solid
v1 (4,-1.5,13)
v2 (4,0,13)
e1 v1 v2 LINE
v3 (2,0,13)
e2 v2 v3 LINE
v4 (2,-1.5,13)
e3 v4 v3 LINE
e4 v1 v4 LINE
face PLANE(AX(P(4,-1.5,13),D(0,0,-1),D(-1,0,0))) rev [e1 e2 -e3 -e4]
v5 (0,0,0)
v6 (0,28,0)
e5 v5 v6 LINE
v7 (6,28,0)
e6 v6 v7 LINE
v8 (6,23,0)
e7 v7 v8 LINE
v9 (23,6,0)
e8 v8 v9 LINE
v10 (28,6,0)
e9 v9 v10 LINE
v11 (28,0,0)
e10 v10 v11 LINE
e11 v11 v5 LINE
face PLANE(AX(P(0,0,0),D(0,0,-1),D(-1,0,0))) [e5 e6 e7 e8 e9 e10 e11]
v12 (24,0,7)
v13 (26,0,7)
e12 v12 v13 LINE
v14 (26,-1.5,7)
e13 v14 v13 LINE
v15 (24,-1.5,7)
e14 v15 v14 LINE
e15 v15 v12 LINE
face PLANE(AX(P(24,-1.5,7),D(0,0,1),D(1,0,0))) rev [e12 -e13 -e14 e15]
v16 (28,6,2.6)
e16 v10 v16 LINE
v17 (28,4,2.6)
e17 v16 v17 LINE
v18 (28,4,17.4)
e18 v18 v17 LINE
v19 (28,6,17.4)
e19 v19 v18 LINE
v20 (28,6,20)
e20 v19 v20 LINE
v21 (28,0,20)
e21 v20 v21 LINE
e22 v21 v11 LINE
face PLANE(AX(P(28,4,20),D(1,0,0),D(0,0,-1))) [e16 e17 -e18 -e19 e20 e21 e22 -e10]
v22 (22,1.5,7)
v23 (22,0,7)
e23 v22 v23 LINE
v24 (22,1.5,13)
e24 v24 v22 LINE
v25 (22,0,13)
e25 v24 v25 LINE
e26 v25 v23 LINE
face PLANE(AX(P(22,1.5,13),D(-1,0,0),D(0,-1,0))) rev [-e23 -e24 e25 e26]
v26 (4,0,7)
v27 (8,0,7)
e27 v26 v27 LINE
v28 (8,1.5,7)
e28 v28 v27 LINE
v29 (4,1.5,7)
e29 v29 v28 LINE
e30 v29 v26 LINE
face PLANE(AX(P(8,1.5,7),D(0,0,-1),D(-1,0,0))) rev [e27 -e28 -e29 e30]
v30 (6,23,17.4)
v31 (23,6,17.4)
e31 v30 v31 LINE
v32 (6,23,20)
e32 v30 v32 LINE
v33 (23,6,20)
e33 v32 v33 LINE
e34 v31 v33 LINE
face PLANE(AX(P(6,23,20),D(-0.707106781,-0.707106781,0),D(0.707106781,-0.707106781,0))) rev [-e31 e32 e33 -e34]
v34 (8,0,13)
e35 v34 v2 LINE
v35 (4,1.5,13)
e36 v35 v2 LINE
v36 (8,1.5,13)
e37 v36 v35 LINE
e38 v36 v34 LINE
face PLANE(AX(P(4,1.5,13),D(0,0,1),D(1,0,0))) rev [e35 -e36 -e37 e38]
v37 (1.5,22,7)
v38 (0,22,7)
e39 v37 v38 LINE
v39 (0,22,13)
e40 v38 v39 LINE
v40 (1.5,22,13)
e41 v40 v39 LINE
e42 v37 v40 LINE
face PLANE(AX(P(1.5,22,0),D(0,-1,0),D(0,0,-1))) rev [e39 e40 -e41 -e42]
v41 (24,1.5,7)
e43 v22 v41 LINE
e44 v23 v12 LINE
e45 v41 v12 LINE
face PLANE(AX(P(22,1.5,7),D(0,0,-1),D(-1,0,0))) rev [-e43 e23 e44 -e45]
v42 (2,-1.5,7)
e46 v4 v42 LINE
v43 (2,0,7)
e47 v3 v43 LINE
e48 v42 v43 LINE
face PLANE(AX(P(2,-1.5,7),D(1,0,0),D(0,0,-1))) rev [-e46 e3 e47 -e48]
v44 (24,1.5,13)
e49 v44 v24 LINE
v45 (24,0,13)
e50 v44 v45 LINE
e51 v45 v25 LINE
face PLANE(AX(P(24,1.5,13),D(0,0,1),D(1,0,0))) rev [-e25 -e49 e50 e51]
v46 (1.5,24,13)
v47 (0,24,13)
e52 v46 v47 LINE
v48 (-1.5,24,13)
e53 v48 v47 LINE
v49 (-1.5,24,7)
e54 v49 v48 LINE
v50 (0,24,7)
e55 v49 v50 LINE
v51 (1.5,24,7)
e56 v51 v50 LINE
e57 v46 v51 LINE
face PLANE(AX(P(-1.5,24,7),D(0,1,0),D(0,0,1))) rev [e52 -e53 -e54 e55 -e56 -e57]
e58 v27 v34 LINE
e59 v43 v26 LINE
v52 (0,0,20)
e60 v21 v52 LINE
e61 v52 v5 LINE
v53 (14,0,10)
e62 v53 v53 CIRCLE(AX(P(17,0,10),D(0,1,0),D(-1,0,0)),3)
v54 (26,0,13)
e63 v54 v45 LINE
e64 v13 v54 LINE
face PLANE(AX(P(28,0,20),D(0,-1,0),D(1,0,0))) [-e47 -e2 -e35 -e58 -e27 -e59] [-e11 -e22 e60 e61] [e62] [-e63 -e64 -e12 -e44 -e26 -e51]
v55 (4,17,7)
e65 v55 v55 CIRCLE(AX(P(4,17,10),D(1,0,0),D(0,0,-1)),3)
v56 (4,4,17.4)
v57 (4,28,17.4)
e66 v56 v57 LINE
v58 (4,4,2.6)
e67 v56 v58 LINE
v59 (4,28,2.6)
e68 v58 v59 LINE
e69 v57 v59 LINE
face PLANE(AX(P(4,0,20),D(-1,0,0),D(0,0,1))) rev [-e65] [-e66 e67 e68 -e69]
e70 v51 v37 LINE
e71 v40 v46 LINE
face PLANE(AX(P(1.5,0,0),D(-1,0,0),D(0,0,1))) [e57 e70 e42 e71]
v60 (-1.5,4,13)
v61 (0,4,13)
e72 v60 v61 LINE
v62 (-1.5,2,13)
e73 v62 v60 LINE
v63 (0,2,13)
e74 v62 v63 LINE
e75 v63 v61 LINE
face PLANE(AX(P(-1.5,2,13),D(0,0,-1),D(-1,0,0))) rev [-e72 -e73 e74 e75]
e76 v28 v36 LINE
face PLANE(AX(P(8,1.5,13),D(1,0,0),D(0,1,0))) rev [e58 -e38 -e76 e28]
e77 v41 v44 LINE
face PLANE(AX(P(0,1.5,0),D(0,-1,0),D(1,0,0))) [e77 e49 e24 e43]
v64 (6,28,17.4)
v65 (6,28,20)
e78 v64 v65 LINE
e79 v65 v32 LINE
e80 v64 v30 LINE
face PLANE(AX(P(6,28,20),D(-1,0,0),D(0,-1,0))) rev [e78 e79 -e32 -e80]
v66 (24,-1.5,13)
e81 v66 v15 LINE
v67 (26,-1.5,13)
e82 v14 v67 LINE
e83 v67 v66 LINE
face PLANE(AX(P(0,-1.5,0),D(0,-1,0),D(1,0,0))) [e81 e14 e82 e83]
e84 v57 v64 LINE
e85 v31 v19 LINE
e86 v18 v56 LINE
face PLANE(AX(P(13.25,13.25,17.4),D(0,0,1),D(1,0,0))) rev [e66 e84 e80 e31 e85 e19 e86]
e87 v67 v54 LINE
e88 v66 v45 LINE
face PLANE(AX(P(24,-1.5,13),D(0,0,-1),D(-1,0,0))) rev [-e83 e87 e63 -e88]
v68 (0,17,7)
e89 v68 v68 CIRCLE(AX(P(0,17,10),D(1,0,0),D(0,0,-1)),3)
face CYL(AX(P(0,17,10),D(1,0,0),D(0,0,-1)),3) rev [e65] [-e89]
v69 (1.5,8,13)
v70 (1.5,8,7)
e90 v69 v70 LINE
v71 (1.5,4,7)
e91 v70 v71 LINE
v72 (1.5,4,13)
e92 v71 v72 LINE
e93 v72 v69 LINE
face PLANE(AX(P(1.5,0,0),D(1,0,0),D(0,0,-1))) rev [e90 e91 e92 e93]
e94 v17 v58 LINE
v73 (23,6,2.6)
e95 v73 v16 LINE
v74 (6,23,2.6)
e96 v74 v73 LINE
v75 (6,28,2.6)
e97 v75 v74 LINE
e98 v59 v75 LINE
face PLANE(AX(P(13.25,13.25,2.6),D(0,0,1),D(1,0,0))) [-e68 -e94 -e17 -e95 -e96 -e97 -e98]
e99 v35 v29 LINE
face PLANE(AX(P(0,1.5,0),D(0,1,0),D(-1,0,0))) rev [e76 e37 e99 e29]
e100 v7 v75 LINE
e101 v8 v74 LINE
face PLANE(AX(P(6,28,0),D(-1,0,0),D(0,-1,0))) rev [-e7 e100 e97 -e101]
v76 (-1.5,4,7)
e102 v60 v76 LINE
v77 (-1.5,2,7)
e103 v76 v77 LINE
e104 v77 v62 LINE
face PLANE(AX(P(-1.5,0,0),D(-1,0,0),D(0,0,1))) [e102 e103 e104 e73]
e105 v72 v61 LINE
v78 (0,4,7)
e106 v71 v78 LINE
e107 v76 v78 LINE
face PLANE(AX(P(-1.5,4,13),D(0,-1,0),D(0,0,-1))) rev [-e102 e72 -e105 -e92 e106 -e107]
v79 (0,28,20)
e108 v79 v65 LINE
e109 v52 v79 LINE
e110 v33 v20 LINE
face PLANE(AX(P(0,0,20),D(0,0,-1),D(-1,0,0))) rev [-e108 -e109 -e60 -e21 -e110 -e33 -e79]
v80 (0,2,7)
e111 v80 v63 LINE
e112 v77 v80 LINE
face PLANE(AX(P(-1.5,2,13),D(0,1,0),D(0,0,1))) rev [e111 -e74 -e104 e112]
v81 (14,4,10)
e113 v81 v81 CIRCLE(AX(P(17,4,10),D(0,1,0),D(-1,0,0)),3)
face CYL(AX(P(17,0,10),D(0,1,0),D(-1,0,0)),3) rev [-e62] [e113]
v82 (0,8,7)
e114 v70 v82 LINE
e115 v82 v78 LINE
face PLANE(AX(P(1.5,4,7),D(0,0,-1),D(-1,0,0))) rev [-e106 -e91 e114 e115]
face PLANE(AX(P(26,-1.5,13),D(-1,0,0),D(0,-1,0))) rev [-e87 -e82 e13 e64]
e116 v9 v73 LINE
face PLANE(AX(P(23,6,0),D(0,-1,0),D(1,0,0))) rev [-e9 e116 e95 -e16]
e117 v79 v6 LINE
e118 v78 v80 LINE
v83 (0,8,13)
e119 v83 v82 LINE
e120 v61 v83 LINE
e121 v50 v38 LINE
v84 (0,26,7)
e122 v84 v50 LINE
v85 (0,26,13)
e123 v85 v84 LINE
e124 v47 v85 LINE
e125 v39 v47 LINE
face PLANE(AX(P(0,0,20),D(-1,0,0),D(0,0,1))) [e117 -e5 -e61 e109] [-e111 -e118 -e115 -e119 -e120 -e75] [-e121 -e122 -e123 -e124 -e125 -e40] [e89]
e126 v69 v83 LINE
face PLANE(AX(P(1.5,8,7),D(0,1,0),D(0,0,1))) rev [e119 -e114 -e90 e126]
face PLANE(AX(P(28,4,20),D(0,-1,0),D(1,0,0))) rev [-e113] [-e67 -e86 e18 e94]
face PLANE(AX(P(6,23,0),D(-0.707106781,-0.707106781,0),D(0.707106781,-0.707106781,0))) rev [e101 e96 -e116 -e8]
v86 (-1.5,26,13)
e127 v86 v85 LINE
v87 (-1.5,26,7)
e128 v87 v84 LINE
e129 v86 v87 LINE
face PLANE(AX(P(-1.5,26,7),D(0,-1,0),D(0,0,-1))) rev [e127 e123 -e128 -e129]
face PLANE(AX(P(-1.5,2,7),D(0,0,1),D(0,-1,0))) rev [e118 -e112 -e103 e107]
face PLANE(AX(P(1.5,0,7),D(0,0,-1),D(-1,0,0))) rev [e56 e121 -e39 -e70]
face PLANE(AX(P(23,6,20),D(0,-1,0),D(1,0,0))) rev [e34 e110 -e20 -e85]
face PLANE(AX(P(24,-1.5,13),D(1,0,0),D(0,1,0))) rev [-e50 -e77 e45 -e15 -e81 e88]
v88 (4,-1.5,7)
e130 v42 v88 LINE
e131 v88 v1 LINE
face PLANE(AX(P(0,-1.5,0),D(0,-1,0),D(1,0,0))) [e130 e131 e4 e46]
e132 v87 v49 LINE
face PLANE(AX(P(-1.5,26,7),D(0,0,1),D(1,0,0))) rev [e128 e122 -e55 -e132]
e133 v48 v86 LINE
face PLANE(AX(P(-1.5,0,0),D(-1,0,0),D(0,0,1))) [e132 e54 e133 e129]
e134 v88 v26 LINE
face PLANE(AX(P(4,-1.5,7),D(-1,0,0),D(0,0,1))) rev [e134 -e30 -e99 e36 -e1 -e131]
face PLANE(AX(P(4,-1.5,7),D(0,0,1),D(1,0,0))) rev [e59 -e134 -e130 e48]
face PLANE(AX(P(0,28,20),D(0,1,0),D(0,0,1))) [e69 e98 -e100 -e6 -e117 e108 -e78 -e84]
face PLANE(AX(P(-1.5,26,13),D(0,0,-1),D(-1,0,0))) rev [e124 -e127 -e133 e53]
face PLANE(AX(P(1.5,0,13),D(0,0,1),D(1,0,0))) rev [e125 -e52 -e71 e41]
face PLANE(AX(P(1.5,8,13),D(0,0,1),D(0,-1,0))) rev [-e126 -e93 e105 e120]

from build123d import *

# Parameters (mm, degrees)
EXTRUDE_1_DEPTH     = 20
SKETCH_2_R          = 3
CUT_EXTRUDE_1_DEPTH = 42.952353927
SKETCH_3_R          = 3
CUT_EXTRUDE_2_DEPTH = 42.952353927
SKETCH_4_W          = 2
SKETCH_4_H          = 6
EXTRUDE_1_2_DEPTH   = 1.5
SKETCH_5_W          = 4
SKETCH_5_H          = 6
CUT_EXTRUDE_3_DEPTH = 1.5
SKETCH_6_W          = 6
SKETCH_6_H          = 2
EXTRUDE_2_DEPTH     = 1.5
SKETCH_7_W          = 6
SKETCH_7_H          = 4
CUT_EXTRUDE_4_DEPTH = 1.5
SKETCH_8_W          = 6
SKETCH_8_H          = 2
EXTRUDE_3_DEPTH     = 1.5
SKETCH_10_W         = 6
SKETCH_10_H         = 2
CUT_EXTRUDE_6_DEPTH = 1.5
SKETCH_11_W         = 2
SKETCH_11_H         = 6
EXTRUDE_4_DEPTH     = 1.5
SKETCH_12_W         = 2
SKETCH_12_H         = 6
CUT_EXTRUDE_7_DEPTH = 1.5
RIB_1_DEPTH         = 2.6
RIB_START           = -2.6
RIB_2_DEPTH         = 2.6


# Read off the part's stored shape, not the designer's step: 筋1, 筋2
with BuildPart() as part:
    # 草图1 → Extrude 1 (new body)
    with BuildSketch(Plane.XY):
        Polygon((28, 0), (0, 0), (0, 28), (4, 28), (4, 4), (28, 4), align=None)
    extrude(amount=EXTRUDE_1_DEPTH)

    # 草图2 → 切除-拉伸1 (cut, through all)
    with BuildSketch(Plane(origin=(0, 4, 0), x_dir=(1, 0, 0), z_dir=(0, 1, 0))):
        with Locations(Location((17, -10, 0), (0, 0, 180))):
            Circle(SKETCH_2_R)
    extrude(amount=-CUT_EXTRUDE_1_DEPTH, mode=Mode.SUBTRACT)

    # 草图3 → 切除-拉伸2 (cut, through all)
    with BuildSketch(Plane(origin=(4, 0, 0), x_dir=(0, 0, -1), z_dir=(1, 0, 0))):
        with Locations((-10, 17)):
            Circle(SKETCH_3_R)
    extrude(amount=-CUT_EXTRUDE_2_DEPTH, mode=Mode.SUBTRACT)

    # 草图4 → Extrude 1 2 (add)
    with BuildSketch(Plane.XZ):
        with Locations((3, 10)):
            Rectangle(SKETCH_4_W, SKETCH_4_H)
    extrude(amount=EXTRUDE_1_2_DEPTH)

    # 草图5 → 切除-拉伸3 (cut)
    with BuildSketch(Plane.XZ):
        with Locations((6, 10)):
            Rectangle(SKETCH_5_W, SKETCH_5_H)
    extrude(amount=-CUT_EXTRUDE_3_DEPTH, mode=Mode.SUBTRACT)

    # 草图6 → 凸台-拉伸2 (add)
    with BuildSketch(Plane.ZY):
        with Locations((10, 3)):
            Rectangle(SKETCH_6_W, SKETCH_6_H)
    extrude(amount=EXTRUDE_2_DEPTH)

    # 草图7 → 切除-拉伸4 (cut)
    with BuildSketch(Plane.ZY):
        with Locations((10, 6)):
            Rectangle(SKETCH_7_W, SKETCH_7_H)
    extrude(amount=-CUT_EXTRUDE_4_DEPTH, mode=Mode.SUBTRACT)

    # 草图8 → 凸台-拉伸3 (add)
    with BuildSketch(Plane.ZY):
        with Locations((10, 25)):
            Rectangle(SKETCH_8_W, SKETCH_8_H)
    extrude(amount=EXTRUDE_3_DEPTH)

    # 草图10 → 切除-拉伸6 (cut)
    with BuildSketch(Plane.ZY):
        with Locations((10, 23)):
            Rectangle(SKETCH_10_W, SKETCH_10_H)
    extrude(amount=-CUT_EXTRUDE_6_DEPTH, mode=Mode.SUBTRACT)

    # 草图11 → 凸台-拉伸4 (add)
    with BuildSketch(Plane.XZ):
        with Locations((25, 10)):
            Rectangle(SKETCH_11_W, SKETCH_11_H)
    extrude(amount=EXTRUDE_4_DEPTH)

    # 草图12 → 切除-拉伸7 (cut)
    with BuildSketch(Plane.XZ):
        with Locations((23, 10)):
            Rectangle(SKETCH_12_W, SKETCH_12_H)
    extrude(amount=-CUT_EXTRUDE_7_DEPTH, mode=Mode.SUBTRACT)

    # 筋1 outline → 筋1 (add)
    with BuildSketch(Plane.XY):
        Polygon((6, 23), (6, 28), (4, 28), (4, 4), (28, 4), (28, 6), (23, 6), align=None)
    extrude(amount=RIB_1_DEPTH)

    # 筋2 outline → 筋2 (add)
    with BuildSketch(Plane.XY.offset(20).offset(RIB_START)):
        Polygon((6, 23), (6, 28), (4, 28), (4, 4), (28, 4), (28, 6), (23, 6), align=None)
    extrude(amount=RIB_2_DEPTH)


solid = part.part
